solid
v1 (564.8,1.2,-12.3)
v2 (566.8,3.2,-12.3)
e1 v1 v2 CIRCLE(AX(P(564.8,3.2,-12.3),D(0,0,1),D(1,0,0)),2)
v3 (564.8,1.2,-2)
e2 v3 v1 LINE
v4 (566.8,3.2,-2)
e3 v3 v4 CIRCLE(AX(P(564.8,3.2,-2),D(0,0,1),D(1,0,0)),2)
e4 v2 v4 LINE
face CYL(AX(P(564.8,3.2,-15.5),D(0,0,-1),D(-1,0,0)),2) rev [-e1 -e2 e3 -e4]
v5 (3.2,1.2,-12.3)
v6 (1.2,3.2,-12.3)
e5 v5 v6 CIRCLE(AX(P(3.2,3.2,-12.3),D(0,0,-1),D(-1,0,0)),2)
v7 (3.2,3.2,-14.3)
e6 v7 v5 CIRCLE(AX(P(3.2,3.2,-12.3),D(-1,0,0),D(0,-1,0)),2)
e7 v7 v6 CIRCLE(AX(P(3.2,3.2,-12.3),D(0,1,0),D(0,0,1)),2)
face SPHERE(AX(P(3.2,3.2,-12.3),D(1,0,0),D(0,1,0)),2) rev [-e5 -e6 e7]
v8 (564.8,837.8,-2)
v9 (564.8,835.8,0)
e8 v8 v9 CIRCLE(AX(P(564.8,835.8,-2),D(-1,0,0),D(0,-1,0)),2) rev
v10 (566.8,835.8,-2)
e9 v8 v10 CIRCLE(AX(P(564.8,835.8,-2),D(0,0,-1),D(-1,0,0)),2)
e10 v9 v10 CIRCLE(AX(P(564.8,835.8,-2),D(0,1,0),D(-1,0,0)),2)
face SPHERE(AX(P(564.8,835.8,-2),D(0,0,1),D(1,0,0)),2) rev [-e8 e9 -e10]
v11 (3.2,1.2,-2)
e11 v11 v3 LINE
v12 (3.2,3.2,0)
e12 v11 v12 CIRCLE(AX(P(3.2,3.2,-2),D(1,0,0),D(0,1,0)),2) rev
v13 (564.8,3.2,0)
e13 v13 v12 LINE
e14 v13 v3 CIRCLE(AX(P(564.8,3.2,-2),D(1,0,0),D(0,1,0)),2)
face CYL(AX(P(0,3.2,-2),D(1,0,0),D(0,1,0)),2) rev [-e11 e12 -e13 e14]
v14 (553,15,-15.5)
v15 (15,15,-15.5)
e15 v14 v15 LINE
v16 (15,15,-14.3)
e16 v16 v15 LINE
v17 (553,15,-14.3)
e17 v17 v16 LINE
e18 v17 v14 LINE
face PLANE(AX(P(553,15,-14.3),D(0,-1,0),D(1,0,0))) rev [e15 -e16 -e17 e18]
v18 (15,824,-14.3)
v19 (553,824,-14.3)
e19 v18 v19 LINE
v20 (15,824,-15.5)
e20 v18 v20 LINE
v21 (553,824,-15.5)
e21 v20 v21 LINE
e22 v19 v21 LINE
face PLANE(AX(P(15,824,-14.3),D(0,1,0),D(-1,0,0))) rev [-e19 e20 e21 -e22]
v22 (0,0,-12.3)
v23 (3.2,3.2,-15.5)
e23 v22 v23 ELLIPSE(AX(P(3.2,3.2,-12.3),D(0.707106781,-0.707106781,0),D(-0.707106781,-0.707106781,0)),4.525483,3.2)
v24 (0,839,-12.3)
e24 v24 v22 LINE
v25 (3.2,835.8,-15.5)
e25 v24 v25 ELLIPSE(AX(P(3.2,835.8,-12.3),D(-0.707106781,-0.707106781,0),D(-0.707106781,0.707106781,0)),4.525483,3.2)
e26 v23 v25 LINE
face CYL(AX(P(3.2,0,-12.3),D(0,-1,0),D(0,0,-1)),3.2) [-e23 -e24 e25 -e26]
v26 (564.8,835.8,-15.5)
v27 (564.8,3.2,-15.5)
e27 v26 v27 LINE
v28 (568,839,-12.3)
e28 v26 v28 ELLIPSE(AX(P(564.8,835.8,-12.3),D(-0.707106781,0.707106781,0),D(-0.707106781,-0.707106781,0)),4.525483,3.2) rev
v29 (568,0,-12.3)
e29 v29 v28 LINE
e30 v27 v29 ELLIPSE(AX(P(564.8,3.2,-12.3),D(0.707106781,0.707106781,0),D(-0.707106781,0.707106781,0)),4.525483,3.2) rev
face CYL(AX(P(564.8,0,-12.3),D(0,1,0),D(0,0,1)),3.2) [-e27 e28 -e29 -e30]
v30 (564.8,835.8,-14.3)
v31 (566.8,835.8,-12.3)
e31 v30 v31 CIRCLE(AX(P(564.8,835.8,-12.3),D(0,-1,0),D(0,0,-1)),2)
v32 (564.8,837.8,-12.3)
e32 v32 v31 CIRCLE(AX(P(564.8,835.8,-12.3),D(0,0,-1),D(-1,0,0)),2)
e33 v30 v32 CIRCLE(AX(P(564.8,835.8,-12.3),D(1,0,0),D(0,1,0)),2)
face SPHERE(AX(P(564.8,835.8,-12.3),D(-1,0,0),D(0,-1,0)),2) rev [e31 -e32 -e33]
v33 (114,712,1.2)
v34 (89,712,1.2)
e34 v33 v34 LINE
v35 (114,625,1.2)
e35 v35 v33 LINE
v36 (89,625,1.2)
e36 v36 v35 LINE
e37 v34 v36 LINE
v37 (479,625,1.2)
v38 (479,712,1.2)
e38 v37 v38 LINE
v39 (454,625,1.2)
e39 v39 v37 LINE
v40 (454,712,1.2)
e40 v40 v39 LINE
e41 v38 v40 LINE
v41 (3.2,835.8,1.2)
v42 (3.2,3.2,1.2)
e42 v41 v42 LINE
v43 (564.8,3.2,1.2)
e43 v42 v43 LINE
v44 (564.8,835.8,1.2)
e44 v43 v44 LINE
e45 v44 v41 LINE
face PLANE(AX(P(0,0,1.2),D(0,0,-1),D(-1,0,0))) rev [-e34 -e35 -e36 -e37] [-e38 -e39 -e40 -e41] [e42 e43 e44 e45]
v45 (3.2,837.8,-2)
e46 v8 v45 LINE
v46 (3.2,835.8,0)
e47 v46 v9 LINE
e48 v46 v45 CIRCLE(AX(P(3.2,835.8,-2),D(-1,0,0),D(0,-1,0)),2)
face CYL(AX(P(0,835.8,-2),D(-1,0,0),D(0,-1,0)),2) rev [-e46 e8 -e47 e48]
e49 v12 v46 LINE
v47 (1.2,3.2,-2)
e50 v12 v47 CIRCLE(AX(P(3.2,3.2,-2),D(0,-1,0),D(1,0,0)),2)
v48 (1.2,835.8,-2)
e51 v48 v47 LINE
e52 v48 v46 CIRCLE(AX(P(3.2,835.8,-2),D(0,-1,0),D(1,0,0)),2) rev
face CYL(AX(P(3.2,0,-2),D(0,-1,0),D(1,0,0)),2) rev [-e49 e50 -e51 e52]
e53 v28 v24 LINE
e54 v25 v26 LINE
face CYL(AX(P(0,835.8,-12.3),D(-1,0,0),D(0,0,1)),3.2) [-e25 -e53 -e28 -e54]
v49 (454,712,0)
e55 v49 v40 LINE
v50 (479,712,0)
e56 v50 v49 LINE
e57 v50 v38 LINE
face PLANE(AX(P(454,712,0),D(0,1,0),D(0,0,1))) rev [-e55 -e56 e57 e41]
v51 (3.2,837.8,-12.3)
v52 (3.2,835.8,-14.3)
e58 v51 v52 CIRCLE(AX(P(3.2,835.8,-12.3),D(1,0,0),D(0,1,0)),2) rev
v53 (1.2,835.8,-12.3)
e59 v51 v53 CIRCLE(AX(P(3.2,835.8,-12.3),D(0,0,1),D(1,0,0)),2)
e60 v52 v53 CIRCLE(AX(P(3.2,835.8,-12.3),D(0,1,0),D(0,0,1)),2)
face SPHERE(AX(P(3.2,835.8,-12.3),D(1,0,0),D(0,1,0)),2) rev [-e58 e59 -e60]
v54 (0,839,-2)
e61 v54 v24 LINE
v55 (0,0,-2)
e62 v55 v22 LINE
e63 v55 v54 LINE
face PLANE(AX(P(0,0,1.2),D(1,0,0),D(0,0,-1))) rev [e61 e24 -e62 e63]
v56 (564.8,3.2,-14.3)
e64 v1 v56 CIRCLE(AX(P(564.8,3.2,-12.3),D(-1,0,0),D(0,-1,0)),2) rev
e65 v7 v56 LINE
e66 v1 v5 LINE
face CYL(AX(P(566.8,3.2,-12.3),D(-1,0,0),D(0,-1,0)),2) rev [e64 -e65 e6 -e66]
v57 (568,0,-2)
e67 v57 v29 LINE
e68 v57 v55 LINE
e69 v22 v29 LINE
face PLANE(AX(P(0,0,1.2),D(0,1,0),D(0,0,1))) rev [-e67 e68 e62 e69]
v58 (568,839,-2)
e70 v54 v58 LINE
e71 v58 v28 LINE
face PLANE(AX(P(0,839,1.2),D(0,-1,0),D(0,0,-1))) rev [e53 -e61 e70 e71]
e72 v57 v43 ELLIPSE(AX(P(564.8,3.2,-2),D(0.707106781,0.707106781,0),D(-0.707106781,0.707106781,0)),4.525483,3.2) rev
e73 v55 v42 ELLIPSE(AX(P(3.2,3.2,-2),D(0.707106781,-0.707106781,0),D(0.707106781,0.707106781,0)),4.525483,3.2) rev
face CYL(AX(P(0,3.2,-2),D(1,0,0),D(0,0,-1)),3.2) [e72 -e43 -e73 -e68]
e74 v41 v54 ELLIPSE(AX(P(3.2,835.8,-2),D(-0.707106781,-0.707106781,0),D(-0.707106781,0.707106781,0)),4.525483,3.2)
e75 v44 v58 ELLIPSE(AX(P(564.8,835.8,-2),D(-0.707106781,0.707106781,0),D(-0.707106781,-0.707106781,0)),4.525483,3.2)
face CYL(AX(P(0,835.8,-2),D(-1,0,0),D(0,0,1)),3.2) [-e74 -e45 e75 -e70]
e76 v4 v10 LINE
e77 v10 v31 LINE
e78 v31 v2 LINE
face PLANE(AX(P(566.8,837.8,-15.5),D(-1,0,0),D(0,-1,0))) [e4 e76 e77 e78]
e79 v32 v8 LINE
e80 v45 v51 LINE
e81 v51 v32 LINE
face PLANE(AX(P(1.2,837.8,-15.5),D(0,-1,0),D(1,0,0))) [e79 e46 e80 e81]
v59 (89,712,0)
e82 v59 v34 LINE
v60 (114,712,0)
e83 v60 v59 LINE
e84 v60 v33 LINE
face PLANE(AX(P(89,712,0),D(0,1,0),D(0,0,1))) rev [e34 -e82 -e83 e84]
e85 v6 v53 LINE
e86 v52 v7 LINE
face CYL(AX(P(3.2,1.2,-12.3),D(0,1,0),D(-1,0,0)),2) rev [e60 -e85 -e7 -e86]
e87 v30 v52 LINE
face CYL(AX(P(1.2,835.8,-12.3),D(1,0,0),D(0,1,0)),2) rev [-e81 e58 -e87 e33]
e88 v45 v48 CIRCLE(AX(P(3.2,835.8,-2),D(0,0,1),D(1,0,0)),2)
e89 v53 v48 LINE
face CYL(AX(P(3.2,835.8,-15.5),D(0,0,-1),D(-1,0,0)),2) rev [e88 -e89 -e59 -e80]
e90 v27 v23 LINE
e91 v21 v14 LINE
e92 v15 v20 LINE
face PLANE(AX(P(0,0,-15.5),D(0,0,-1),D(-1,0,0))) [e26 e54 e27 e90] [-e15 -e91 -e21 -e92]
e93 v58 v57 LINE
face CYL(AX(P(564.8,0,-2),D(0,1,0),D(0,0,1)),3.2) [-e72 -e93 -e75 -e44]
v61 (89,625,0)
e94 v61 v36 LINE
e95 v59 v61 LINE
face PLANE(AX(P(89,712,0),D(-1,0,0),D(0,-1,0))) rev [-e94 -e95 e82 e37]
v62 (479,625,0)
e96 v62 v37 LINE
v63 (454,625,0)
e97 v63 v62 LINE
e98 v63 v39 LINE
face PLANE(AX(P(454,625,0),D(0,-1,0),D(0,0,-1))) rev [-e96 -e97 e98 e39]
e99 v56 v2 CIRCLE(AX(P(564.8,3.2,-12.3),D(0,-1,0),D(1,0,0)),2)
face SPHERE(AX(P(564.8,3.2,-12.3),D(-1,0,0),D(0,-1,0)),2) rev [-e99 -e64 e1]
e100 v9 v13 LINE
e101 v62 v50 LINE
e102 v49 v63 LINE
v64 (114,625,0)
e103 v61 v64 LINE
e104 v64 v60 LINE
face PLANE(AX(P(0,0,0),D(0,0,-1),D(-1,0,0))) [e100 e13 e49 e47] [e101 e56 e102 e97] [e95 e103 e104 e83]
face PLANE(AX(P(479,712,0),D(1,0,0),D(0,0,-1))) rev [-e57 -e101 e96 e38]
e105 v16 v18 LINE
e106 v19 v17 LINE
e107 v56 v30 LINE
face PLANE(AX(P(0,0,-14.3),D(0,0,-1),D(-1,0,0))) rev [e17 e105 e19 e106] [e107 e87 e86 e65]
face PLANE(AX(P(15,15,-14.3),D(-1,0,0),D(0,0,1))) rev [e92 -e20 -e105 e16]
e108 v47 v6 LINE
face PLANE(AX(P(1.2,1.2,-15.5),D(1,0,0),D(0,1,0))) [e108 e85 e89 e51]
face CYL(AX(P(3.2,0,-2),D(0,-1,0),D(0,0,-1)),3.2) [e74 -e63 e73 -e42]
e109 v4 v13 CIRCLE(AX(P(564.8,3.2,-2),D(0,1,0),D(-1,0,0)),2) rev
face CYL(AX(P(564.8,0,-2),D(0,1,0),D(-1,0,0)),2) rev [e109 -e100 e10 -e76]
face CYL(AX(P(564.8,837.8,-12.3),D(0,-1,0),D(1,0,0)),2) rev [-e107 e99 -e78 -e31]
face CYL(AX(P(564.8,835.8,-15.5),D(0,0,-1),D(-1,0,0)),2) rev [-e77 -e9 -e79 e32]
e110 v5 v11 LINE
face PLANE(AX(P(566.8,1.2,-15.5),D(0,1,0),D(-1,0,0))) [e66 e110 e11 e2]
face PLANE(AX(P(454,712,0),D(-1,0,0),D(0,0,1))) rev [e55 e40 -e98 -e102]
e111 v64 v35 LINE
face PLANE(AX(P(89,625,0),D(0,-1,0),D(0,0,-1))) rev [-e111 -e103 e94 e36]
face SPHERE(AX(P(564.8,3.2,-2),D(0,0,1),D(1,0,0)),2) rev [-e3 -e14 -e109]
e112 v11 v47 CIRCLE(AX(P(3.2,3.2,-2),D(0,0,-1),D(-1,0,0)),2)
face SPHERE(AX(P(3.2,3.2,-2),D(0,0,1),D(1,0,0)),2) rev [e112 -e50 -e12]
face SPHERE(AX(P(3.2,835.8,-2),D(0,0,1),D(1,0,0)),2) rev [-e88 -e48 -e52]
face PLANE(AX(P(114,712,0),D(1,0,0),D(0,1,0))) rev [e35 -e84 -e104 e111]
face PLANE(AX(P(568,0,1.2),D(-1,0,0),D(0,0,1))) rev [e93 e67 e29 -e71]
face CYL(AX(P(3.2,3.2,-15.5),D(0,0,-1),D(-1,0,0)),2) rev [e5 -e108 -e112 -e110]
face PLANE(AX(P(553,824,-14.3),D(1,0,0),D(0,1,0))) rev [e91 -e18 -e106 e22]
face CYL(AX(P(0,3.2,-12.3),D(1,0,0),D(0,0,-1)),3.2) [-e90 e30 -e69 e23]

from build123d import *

# Parameters (mm, degrees)
SKETCH_1_W          = 568
SKETCH_1_H          = 839
EXTRUDE_1_DEPTH     = 1.2
SKETCH_2_W          = 25
SKETCH_2_H          = 87
CUT_EXTRUDE_1_DEPTH = 1014.186280997
SKETCH_3_W          = 568
SKETCH_3_H          = 839
SKETCH_3_W_2        = 565.6
SKETCH_3_H_2        = 836.6
EXTRUDE_2_DEPTH     = 15.5
SKETCH_4_W          = 568
SKETCH_4_H          = 839
SKETCH_4_W_2        = 538
SKETCH_4_H_2        = 809
EXTRUDE_3_DEPTH     = 1.2
FILLET_1_R          = 3.2
FILLET_3_R          = 2
FILLET_4_R          = 3.2
FILLET_5_R          = 2
FILLET_6_R          = 2


with BuildPart() as part:
    # 스케치1 → 보스-돌출1 (new body)
    with BuildSketch(Plane.XY):
        with Locations((284, 419.5)):
            Rectangle(SKETCH_1_W, SKETCH_1_H)
    extrude(amount=EXTRUDE_1_DEPTH)

    # 스케치2 → 컷-돌출1 (cut, through all)
    with BuildSketch(Plane.XY.offset(1.2)):
        with Locations((101.5, 668.5)):
            Rectangle(SKETCH_2_W, SKETCH_2_H)
        with Locations((466.5, 668.5)):
            Rectangle(SKETCH_2_W, SKETCH_2_H)
    extrude(amount=-CUT_EXTRUDE_1_DEPTH, mode=Mode.SUBTRACT)

    # 스케치3 → 보스-돌출2 (add)
    with BuildSketch(Plane(origin=(0, 0, 0), x_dir=(-1, 0, 0), z_dir=(0, 0, -1))):
        with Locations((-284, 419.5)):
            Rectangle(SKETCH_3_W, SKETCH_3_H)
        with Locations((-284, 419.5)):
            Rectangle(SKETCH_3_W_2, SKETCH_3_H_2, mode=Mode.SUBTRACT)
    extrude(amount=EXTRUDE_2_DEPTH)

    # 스케치4 → 보스-돌출3 (add)
    with BuildSketch(Plane(origin=(0, 0, -15.5), x_dir=(-1, 0, 0), z_dir=(0, 0, -1))):
        with Locations((-284, 419.5)):
            Rectangle(SKETCH_4_W, SKETCH_4_H)
        with Locations((-284, 419.5)):
            Rectangle(SKETCH_4_W_2, SKETCH_4_H_2, mode=Mode.SUBTRACT)
    extrude(amount=-EXTRUDE_3_DEPTH)

    # 필렛1
    fillet_1_edges = [part.edges().sort_by_distance(p)[0] for p in [
        (568, 419.5, 1.2),
        (284, 839, 1.2),
        (0, 419.5, 1.2),
        (284, 0, 1.2),
    ]]
    fillet(fillet_1_edges, radius=FILLET_1_R)

    # 필렛3
    fillet_3_edges = [part.edges().sort_by_distance(p)[0] for p in [
        (1.2, 419.5, 0),
        (284, 837.8, 0),
        (566.8, 419.5, 0),
        (284, 1.2, 0),
    ]]
    fillet(fillet_3_edges, radius=FILLET_3_R)

    # 필렛4
    fillet_4_edges = [part.edges().sort_by_distance(p)[0] for p in [
        (284, 0, -15.5),
        (0, 419.5, -15.5),
        (284, 839, -15.5),
        (568, 419.5, -15.5),
    ]]
    fillet(fillet_4_edges, radius=FILLET_4_R)

    # 필렛5
    fillet_5_edges = [part.edges().sort_by_distance(p)[0] for p in [
        (284, 1.2, -14.3),
        (284, 837.8, -14.3),
    ]]
    fillet(fillet_5_edges, radius=FILLET_5_R)

    # 필렛6
    # the kernel refuses this fillet: 2 mm, written as the material it adds along each edge
    with BuildSketch(Plane(origin=(564.8, 835.8, -2), x_dir=(0, 1, 0), z_dir=(1, 0, 0))) as fillet_6_piece_1_section:
        Polygon((0, 0), (FILLET_6_R, 0), (FILLET_6_R, FILLET_6_R), (0, FILLET_6_R), align=None)
    fillet_6_piece_1 = extrude(amount=FILLET_6_R, mode=Mode.PRIVATE)
    fillet_6_piece_1 = fillet_6_piece_1 - Plane(origin=(564.8, 835.8, -2), x_dir=(0, -0.7071067811865475, -0.7071067811865475), z_dir=(1, 0, 0)) * Sphere(FILLET_6_R, mode=Mode.PRIVATE)
    add(fillet_6_piece_1)
    with BuildSketch(Plane(origin=(3.2, 835.8, -2), x_dir=(0, 1, 0), z_dir=(-1, 0, 0))) as fillet_6_piece_2_section:
        Polygon((0, 0), (FILLET_6_R, 0), (FILLET_6_R, -FILLET_6_R), (0, -FILLET_6_R), align=None)
    fillet_6_piece_2 = extrude(amount=FILLET_6_R, mode=Mode.PRIVATE)
    fillet_6_piece_2 = fillet_6_piece_2 - Plane(origin=(3.2, 835.8, -2), x_dir=(0, -0.7071067811865475, -0.7071067811865475), z_dir=(-1, 0, 0)) * Sphere(FILLET_6_R, mode=Mode.PRIVATE)
    add(fillet_6_piece_2)
    with BuildSketch(Plane(origin=(564.8, 3.2, -2), x_dir=(0, -1, 0), z_dir=(1, 0, 0))) as fillet_6_piece_3_section:
        Polygon((0, 0), (FILLET_6_R, 0), (FILLET_6_R, -FILLET_6_R), (0, -FILLET_6_R), align=None)
    fillet_6_piece_3 = extrude(amount=FILLET_6_R, mode=Mode.PRIVATE)
    fillet_6_piece_3 = fillet_6_piece_3 - Plane(origin=(564.8, 3.2, -2), x_dir=(0, 0.7071067811865475, -0.7071067811865475), z_dir=(1, 0, 0)) * Sphere(FILLET_6_R, mode=Mode.PRIVATE)
    add(fillet_6_piece_3)
    with BuildSketch(Plane(origin=(3.2, 3.2, -2), x_dir=(0, -1, 0), z_dir=(-1, 0, 0))) as fillet_6_piece_4_section:
        Polygon((0, 0), (FILLET_6_R, 0), (FILLET_6_R, FILLET_6_R), (0, FILLET_6_R), align=None)
    fillet_6_piece_4 = extrude(amount=FILLET_6_R, mode=Mode.PRIVATE)
    fillet_6_piece_4 = fillet_6_piece_4 - Plane(origin=(3.2, 3.2, -2), x_dir=(0, 0.7071067811865475, -0.7071067811865475), z_dir=(-1, 0, 0)) * Sphere(FILLET_6_R, mode=Mode.PRIVATE)
    add(fillet_6_piece_4)
    with BuildSketch(Plane(origin=(566.8, 837.8, -2), x_dir=(0, -1, 0), z_dir=(0, 0, -1)), Plane(origin=(1.2, 1.2, -2), x_dir=(0, 1, 0), z_dir=(0, 0, -1))) as fillet_6_piece_5:
        with BuildLine():
            CenterArc((FILLET_6_R, FILLET_6_R), FILLET_6_R, 180, 90)
            Line((0, FILLET_6_R), (0, 0))
            Line((0, 0), (FILLET_6_R, 0))
        make_face()
    extrude(amount=10.3)
    with BuildSketch(Plane(origin=(1.2, 837.8, -2), x_dir=(0, -1, 0), z_dir=(0, 0, -1)), Plane(origin=(566.8, 1.2, -2), x_dir=(0, 1, 0), z_dir=(0, 0, -1))) as fillet_6_piece_6:
        with BuildLine():
            CenterArc((FILLET_6_R, -FILLET_6_R), FILLET_6_R, 90, 90)
            Line((0, -FILLET_6_R), (0, 0))
            Line((0, 0), (FILLET_6_R, 0))
        make_face()
    extrude(amount=10.3)
    with BuildSketch(Plane(origin=(566.8, 835.8, -14.3), x_dir=(-1, 0, 0), z_dir=(0, -1, 0)), Plane(origin=(1.2, 3.2, -14.3), x_dir=(1, 0, 0), z_dir=(0, 1, 0))) as fillet_6_piece_7:
        with BuildLine():
            CenterArc((FILLET_6_R, -FILLET_6_R), FILLET_6_R, 90, 90)
            Line((0, -FILLET_6_R), (0, 0))
            Line((0, 0), (FILLET_6_R, 0))
        make_face()
    extrude(amount=832.6)
    with BuildSketch(Plane(origin=(566.8, 3.2, -12.3), x_dir=(0, 0, -1), z_dir=(0, 1, 0))) as fillet_6_piece_8:
        with BuildLine():
            CenterArc((2 - FILLET_6_R, FILLET_6_R), FILLET_6_R, 270, 90)
            Line((2 - FILLET_6_R, 0), (2, 0))
            Line((2, 0), (2, FILLET_6_R))
        make_face()
    revolve(axis=Axis((566.8, 3.2, -12.3), (-1, 0, 0)), revolution_arc=90)
    with BuildSketch(Plane(origin=(566.8, 835.8, -12.3), x_dir=(0, 0, -1), z_dir=(0, -1, 0))) as fillet_6_piece_9:
        with BuildLine():
            CenterArc((2 - FILLET_6_R, -FILLET_6_R), FILLET_6_R, 0, 90)
            Line((2 - FILLET_6_R, 0), (2, 0))
            Line((2, 0), (2, -FILLET_6_R))
        make_face()
    revolve(axis=Axis((566.8, 835.8, -12.3), (1, 0, 0)), revolution_arc=90)
    with BuildSketch(Plane(origin=(1.2, 3.2, -12.3), x_dir=(0, 0, -1), z_dir=(0, 1, 0))) as fillet_6_piece_10:
        with BuildLine():
            CenterArc((2 - FILLET_6_R, -FILLET_6_R), FILLET_6_R, 360, 90)
            Line((2, -FILLET_6_R), (2, 0))
            Line((2, 0), (2 - FILLET_6_R, 0))
        make_face()
    revolve(axis=Axis((1.2, 3.2, -12.3), (-1, 0, 0)), revolution_arc=90)
    with BuildSketch(Plane(origin=(1.2, 835.8, -12.3), x_dir=(0, 0, -1), z_dir=(0, -1, 0))) as fillet_6_piece_11:
        with BuildLine():
            CenterArc((2 - FILLET_6_R, FILLET_6_R), FILLET_6_R, 270, 90)
            Line((2, FILLET_6_R), (2, 0))
            Line((2, 0), (2 - FILLET_6_R, 0))
        make_face()
    revolve(axis=Axis((1.2, 835.8, -12.3), (1, 0, 0)), revolution_arc=90)


solid = part.part
